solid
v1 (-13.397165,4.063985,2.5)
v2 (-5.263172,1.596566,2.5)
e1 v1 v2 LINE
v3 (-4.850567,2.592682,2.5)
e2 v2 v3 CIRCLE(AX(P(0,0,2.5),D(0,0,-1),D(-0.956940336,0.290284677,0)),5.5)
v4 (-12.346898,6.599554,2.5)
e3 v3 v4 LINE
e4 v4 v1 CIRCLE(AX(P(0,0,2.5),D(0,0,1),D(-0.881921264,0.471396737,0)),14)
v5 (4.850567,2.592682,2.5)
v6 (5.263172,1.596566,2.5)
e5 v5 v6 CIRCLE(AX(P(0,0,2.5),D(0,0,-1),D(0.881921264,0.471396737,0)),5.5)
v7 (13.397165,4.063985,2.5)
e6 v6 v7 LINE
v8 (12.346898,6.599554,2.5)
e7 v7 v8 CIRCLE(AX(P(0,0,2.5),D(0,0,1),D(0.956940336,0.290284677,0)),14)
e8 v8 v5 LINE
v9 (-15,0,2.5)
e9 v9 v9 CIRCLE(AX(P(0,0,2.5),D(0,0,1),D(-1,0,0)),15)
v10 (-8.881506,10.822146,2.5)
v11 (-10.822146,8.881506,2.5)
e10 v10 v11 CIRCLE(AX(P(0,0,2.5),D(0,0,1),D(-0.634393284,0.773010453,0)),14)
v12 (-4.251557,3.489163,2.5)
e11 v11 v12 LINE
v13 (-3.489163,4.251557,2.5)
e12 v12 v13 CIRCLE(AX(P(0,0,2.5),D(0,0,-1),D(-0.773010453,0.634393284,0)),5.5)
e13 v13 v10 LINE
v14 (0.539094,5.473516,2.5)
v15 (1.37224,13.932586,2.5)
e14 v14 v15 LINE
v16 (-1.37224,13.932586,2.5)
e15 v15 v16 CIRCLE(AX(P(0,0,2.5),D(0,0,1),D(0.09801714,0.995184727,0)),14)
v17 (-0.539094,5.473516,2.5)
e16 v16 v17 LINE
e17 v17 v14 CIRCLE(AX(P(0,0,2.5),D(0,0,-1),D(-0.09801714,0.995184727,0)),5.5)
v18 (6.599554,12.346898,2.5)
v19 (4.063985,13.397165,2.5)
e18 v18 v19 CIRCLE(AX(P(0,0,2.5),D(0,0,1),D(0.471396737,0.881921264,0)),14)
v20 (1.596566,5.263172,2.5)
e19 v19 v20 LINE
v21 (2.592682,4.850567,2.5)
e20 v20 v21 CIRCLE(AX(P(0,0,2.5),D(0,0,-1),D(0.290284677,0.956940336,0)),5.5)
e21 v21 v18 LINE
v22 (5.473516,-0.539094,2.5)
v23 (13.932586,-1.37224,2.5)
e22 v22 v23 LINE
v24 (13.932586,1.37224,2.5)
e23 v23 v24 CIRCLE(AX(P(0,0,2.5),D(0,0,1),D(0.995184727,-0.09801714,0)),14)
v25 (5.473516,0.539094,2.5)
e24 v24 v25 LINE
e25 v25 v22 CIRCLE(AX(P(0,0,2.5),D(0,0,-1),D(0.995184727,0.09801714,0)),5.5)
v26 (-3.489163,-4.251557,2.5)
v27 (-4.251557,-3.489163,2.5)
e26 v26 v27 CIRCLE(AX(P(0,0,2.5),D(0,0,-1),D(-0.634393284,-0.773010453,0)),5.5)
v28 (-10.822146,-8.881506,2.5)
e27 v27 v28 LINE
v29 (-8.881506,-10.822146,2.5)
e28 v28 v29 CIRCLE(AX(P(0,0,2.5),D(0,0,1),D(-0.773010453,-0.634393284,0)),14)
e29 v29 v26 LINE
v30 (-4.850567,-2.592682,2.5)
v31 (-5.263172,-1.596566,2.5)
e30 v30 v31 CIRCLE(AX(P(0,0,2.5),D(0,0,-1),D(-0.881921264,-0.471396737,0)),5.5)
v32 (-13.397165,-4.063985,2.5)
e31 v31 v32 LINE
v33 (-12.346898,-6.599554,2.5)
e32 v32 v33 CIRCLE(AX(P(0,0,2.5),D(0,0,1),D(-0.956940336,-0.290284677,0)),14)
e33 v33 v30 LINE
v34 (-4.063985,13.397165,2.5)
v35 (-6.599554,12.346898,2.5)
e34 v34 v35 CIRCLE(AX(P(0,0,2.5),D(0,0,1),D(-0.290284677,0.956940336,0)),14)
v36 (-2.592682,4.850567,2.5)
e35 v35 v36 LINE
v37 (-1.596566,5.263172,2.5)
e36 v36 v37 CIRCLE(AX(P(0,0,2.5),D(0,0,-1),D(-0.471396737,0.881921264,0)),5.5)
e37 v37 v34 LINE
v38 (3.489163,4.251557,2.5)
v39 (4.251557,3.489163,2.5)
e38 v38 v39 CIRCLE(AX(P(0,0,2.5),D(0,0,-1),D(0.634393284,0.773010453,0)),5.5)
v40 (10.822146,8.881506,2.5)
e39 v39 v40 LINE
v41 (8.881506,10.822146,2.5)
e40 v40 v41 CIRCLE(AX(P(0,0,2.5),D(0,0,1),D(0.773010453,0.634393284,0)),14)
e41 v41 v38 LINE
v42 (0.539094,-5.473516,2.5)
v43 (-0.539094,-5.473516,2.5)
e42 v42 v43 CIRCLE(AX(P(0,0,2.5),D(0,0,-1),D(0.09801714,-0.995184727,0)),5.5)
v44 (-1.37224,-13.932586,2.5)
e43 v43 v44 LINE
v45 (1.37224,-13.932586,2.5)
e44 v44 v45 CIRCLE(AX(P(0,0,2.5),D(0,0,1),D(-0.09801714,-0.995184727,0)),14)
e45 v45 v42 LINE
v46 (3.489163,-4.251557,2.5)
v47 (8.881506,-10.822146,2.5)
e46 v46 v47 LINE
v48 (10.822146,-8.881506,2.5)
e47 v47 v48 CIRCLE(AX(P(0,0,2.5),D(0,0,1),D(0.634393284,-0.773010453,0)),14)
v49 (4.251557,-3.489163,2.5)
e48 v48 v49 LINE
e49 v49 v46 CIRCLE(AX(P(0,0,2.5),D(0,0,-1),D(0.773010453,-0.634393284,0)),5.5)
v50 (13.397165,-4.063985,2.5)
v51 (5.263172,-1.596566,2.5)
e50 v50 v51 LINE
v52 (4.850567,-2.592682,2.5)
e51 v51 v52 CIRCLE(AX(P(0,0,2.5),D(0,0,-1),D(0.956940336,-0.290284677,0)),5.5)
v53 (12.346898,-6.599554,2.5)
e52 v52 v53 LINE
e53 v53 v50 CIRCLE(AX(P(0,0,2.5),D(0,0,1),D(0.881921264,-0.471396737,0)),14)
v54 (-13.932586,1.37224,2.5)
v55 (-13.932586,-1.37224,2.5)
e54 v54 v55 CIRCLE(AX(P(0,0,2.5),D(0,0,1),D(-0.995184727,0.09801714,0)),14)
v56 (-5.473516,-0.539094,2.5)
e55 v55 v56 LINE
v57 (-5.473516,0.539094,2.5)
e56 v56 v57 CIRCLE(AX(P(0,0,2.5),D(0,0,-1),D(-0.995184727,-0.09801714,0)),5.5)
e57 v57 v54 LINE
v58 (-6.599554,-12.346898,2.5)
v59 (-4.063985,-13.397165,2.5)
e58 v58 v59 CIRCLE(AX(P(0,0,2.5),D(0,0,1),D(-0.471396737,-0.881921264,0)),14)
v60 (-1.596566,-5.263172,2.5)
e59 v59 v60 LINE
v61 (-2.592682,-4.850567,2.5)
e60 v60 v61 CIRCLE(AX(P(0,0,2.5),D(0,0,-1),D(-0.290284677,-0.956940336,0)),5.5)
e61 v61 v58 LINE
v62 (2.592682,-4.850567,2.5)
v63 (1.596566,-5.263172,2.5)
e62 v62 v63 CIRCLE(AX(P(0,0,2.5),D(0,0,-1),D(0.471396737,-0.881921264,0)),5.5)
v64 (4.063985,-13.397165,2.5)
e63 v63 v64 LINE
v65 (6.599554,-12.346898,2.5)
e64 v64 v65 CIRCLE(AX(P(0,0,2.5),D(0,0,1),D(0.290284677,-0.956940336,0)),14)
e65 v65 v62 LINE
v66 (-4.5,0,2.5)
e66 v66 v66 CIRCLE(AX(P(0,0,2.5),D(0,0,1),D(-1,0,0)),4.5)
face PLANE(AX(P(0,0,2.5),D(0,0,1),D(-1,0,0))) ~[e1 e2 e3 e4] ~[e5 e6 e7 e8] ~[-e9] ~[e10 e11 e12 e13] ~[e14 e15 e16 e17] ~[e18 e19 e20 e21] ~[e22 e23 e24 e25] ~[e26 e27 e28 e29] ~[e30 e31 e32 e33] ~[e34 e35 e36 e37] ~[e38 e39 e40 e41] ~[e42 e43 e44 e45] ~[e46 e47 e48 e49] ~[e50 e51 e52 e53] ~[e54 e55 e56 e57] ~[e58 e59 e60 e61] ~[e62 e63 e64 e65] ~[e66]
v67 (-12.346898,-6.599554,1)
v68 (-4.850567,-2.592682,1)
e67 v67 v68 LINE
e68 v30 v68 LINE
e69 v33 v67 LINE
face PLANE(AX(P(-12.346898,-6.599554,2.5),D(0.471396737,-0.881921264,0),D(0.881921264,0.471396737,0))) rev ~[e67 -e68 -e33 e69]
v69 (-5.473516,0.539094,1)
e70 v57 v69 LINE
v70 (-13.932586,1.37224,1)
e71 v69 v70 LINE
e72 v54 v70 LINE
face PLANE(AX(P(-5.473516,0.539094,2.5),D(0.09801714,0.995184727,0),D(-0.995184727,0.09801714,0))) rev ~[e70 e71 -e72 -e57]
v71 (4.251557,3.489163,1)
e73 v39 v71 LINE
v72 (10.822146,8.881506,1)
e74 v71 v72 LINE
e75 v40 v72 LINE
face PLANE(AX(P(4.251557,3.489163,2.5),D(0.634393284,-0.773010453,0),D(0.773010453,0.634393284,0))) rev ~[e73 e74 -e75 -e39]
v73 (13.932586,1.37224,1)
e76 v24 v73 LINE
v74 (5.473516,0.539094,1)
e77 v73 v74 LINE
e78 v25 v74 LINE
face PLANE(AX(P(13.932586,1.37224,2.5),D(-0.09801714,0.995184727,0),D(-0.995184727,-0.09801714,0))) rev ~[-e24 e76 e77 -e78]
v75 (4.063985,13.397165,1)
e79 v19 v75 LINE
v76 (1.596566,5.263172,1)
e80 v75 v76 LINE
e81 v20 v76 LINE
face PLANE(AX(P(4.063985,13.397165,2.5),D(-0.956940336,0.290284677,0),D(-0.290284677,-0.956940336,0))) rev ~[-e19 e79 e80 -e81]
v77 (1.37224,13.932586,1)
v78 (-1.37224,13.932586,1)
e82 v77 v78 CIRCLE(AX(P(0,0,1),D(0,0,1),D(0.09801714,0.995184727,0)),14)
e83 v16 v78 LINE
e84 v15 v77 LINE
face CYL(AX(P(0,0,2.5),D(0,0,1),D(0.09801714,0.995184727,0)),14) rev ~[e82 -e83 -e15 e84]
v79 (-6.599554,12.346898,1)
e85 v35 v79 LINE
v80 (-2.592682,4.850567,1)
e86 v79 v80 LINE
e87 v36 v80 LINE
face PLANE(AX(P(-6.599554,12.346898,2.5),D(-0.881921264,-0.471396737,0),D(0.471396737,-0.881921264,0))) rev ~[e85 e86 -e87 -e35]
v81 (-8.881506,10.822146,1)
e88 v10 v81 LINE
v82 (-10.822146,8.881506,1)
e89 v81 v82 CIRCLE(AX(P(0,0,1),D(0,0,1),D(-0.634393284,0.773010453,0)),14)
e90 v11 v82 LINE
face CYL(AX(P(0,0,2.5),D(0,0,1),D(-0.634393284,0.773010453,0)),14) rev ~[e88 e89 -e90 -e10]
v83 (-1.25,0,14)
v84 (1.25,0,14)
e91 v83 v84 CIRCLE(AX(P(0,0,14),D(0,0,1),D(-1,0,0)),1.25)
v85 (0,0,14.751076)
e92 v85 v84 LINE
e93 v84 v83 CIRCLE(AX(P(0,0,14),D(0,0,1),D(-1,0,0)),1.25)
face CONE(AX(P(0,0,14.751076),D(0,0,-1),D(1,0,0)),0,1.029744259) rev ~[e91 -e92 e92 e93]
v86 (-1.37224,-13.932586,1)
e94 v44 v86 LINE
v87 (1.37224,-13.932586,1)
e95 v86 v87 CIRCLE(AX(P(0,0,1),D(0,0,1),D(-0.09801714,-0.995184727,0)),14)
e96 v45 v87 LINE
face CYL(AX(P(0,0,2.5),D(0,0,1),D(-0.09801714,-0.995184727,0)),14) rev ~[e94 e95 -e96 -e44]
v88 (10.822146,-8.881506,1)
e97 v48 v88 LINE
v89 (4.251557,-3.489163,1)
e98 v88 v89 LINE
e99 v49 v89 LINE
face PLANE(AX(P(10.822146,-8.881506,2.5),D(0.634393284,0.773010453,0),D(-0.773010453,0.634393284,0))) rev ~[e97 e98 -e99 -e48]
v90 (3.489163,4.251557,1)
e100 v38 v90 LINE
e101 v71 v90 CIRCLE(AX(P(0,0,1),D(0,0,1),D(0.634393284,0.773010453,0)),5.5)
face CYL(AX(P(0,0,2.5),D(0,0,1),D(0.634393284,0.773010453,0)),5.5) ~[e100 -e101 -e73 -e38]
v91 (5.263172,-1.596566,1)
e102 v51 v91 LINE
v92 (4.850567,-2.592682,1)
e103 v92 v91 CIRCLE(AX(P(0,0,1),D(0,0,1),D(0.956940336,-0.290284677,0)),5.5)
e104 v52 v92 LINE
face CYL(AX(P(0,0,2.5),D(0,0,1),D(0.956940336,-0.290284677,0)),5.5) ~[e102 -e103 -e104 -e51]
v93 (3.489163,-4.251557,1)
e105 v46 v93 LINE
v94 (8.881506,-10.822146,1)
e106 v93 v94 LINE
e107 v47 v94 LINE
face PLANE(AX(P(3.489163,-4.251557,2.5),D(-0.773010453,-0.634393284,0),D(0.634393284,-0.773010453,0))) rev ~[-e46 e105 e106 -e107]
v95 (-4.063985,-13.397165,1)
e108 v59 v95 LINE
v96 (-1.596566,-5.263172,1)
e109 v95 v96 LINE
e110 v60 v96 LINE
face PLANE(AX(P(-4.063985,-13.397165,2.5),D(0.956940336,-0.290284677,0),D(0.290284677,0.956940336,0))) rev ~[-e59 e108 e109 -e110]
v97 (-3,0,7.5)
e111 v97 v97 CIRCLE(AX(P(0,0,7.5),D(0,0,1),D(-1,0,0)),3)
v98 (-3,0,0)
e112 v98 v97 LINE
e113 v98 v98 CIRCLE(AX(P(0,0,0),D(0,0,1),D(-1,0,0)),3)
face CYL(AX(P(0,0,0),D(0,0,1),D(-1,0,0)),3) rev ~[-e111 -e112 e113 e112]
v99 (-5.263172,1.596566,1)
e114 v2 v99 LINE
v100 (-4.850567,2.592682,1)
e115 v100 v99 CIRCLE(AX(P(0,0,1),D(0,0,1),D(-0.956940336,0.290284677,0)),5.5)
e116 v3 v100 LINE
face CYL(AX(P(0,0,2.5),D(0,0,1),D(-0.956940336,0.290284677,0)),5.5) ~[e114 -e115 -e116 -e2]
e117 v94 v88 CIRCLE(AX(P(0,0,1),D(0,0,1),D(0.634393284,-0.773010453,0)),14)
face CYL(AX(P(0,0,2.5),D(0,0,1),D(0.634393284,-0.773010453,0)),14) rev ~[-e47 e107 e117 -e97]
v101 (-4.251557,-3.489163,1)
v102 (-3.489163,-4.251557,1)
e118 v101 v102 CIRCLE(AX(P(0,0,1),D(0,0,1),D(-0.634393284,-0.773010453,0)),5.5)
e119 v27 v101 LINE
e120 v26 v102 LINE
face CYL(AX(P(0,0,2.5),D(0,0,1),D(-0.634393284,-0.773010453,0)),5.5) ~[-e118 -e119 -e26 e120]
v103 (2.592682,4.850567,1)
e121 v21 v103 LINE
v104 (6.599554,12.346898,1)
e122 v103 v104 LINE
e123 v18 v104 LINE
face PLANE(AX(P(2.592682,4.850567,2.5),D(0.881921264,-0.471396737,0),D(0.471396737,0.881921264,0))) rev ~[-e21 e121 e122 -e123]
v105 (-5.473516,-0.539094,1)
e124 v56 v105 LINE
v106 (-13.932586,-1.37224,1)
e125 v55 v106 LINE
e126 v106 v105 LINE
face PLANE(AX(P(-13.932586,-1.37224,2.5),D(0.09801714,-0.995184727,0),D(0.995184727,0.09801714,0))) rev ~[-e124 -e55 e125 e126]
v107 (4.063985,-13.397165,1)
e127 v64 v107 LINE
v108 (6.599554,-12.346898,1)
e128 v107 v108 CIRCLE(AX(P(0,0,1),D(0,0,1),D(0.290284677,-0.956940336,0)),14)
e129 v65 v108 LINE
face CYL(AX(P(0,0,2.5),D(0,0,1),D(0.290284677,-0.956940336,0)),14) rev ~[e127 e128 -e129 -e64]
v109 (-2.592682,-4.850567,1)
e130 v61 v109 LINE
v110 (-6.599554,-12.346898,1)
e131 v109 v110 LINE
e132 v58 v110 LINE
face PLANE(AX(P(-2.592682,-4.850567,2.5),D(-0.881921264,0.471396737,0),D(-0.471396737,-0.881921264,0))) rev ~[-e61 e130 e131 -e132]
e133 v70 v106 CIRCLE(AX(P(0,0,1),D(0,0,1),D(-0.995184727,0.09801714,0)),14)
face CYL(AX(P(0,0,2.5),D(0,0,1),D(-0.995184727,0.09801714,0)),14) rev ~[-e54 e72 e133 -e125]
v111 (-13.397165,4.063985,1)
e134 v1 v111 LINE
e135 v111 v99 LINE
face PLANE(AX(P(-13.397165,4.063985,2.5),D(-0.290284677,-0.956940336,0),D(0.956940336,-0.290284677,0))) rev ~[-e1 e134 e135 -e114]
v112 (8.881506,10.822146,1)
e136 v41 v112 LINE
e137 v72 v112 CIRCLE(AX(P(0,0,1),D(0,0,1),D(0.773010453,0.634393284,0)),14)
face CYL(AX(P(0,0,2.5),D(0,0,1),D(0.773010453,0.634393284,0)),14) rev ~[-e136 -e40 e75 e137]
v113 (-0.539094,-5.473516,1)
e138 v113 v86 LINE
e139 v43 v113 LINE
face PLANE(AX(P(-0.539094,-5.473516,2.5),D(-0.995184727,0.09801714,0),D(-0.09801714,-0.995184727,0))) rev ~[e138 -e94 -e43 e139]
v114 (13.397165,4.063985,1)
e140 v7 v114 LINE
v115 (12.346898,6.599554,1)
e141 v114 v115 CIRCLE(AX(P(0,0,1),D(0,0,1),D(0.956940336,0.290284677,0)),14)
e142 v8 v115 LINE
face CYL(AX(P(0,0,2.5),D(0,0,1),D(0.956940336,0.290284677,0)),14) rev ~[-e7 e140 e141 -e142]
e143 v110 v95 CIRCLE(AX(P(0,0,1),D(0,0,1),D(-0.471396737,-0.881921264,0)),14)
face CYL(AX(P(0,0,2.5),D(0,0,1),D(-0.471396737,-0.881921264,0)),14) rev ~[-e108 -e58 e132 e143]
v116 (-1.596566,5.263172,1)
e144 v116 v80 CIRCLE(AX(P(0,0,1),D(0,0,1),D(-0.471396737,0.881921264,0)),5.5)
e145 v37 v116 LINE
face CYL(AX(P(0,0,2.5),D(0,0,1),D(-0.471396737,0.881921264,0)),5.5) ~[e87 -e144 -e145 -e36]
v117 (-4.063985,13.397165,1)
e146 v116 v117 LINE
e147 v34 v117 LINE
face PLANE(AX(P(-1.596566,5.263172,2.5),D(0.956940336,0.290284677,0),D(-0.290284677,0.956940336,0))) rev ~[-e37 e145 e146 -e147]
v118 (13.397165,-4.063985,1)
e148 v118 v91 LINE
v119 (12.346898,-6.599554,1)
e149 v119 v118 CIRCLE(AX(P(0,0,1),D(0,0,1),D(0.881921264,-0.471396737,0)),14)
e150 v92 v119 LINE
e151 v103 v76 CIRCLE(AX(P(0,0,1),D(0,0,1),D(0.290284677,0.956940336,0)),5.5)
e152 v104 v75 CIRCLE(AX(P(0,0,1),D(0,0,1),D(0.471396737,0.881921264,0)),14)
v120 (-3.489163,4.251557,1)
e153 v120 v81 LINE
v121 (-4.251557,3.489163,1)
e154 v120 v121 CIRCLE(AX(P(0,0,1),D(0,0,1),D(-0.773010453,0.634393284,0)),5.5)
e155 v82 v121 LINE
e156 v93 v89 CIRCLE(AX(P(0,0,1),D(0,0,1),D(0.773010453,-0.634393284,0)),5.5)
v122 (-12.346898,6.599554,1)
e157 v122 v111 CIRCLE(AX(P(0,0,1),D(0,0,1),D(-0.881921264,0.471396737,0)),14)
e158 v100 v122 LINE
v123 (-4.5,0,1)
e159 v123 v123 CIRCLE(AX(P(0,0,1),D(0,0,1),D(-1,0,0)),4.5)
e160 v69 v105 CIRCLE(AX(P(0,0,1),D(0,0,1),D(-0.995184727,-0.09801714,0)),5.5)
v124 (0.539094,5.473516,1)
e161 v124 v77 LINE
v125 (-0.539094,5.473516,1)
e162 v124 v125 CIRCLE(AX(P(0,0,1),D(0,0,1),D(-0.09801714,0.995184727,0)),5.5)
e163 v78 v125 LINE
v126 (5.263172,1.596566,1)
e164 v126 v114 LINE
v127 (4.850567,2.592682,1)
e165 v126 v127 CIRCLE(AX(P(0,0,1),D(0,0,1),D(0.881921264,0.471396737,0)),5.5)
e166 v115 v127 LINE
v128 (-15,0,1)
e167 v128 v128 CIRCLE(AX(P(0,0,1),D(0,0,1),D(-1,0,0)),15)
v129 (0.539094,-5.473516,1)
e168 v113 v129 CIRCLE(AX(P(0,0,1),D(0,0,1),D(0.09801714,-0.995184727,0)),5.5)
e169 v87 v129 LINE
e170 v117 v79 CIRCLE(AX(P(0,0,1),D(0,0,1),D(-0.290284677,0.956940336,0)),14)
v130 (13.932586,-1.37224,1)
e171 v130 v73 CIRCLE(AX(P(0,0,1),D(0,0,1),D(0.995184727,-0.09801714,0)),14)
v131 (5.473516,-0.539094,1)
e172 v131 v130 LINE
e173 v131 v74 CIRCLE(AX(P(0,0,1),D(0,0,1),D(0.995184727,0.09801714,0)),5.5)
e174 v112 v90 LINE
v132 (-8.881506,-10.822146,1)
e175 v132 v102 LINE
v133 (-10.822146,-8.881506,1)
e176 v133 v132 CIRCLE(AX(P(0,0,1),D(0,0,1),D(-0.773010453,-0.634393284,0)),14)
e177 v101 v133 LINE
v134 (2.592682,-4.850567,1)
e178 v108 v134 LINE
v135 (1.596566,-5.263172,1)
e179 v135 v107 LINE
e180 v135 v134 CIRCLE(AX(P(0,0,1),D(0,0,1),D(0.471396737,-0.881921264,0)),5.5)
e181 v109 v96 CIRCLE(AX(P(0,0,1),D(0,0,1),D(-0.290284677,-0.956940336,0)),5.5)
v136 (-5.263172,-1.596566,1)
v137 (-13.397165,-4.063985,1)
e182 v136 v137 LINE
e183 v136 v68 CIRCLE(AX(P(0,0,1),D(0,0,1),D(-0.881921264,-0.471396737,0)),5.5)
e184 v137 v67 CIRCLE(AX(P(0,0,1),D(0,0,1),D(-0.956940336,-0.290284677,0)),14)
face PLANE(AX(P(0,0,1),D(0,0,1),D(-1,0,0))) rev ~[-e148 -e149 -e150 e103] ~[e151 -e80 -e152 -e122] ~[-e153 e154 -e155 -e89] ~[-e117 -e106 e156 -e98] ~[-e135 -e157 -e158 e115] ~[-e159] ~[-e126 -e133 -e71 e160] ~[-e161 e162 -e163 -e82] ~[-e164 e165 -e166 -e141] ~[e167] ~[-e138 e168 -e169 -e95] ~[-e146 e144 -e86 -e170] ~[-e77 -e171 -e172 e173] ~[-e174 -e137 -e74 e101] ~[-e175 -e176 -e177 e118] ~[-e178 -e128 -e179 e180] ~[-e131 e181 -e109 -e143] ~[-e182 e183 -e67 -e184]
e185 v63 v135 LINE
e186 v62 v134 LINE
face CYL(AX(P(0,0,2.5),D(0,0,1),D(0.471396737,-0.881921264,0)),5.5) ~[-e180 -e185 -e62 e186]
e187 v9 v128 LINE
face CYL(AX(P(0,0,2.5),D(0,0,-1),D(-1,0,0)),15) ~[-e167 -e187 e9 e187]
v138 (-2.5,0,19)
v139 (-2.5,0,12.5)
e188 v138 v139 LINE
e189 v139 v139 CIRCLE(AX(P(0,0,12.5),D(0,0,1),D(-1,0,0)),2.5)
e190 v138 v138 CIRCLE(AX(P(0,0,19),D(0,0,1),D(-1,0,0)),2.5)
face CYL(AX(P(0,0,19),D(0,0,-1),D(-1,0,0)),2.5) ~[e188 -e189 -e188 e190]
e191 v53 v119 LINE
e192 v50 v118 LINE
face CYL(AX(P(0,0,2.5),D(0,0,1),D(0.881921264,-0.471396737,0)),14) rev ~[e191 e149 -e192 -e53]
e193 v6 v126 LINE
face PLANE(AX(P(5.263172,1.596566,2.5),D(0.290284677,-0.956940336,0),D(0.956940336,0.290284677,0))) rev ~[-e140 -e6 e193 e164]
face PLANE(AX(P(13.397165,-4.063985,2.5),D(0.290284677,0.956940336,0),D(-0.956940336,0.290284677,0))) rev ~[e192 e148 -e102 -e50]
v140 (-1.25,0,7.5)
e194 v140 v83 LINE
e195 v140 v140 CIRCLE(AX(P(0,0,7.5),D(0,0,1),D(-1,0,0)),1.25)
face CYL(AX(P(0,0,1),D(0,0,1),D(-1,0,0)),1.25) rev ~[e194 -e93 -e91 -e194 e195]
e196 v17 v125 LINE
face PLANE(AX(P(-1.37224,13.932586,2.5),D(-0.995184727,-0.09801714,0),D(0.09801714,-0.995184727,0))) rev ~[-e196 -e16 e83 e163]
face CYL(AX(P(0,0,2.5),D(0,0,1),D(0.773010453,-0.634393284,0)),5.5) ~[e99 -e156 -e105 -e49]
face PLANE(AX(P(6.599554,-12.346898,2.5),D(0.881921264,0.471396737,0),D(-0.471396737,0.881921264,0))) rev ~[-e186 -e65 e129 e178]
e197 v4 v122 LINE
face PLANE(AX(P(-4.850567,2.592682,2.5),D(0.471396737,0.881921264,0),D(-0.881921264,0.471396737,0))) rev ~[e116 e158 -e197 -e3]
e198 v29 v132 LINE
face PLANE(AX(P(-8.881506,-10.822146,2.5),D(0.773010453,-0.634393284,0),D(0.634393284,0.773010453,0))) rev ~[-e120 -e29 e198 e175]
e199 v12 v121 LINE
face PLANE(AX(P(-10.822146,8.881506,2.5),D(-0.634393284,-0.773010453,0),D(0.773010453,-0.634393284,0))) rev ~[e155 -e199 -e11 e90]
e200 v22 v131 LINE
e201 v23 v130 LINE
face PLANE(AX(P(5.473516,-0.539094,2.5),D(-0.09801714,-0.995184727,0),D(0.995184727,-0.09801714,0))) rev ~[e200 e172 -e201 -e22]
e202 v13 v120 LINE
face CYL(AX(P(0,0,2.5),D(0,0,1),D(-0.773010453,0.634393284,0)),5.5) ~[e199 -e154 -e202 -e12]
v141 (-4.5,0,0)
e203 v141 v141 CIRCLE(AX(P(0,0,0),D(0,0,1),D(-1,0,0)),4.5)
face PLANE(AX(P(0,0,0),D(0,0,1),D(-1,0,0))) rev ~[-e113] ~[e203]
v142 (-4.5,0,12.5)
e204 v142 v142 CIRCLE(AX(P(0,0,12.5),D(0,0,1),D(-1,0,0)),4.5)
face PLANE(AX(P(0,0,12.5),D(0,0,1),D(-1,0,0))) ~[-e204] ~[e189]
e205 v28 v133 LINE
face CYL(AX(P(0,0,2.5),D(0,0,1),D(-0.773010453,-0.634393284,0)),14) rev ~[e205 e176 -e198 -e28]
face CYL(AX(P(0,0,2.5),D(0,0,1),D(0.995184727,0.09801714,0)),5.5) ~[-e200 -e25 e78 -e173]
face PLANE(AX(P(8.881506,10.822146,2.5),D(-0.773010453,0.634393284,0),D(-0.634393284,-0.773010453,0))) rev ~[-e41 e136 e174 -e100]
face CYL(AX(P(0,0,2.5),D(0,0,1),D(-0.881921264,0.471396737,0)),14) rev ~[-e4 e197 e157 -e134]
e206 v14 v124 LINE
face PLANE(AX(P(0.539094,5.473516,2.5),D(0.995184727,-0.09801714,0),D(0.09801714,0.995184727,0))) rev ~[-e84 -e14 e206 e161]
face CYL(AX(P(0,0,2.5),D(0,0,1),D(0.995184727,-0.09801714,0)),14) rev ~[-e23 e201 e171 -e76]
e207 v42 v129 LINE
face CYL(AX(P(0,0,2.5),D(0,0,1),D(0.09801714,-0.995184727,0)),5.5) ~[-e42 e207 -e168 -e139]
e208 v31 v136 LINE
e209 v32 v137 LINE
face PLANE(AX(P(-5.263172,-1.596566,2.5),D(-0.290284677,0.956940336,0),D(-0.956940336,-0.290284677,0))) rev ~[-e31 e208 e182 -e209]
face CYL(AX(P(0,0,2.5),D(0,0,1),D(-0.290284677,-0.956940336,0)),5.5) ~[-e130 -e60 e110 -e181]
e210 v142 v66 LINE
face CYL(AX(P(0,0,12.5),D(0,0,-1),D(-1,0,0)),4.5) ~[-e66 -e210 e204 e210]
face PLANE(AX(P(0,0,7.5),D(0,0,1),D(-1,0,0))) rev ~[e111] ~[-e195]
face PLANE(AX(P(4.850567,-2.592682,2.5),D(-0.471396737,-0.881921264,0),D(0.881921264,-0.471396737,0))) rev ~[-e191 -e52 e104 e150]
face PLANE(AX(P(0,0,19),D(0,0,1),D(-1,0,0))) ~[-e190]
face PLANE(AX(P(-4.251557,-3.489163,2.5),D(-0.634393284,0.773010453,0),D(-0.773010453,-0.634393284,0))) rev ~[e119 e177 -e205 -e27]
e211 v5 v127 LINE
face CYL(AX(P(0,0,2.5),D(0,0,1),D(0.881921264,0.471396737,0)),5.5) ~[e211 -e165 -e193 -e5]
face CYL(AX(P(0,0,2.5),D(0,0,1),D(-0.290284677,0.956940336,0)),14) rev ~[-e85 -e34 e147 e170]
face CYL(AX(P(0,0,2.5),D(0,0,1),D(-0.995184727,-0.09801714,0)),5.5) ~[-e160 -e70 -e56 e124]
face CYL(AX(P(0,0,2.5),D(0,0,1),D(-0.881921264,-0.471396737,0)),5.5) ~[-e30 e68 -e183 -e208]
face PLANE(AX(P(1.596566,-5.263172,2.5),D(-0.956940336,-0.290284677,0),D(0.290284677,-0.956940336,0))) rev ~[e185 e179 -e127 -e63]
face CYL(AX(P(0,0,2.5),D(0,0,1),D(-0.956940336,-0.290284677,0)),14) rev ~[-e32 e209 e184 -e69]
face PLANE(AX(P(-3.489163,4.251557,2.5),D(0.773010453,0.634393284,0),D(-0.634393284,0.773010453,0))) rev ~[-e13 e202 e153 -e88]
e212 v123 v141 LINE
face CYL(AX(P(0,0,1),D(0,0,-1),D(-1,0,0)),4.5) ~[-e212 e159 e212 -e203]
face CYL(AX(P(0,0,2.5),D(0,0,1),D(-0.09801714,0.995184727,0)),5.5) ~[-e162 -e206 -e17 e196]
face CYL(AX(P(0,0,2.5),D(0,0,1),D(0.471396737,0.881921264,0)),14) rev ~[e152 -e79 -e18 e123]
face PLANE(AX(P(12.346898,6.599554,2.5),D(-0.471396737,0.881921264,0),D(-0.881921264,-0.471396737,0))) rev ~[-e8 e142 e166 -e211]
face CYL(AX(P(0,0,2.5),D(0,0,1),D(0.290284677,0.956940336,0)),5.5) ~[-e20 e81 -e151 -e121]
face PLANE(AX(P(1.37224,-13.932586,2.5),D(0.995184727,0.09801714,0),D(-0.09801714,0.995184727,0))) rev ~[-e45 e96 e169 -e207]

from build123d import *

# Parameters (mm, degrees)
F3_D            = 2.5
F3_DEPTH        = 6.5
F3_TIP          = 0.7510757738
F5_DEPTH        = 2.501
F5_COPIES_COUNT = 16


# Not quite as in the source:
# - a pattern or mirror of a feature is missing from the dataset's text; its kind, count and spacing are read off the source's solid


with BuildPart() as f1:
    # F0 (on Front) → F1 (revolve)
    with BuildSketch(Plane.XZ):
        Polygon((-4.5, 0), (-3, 0), (-3, 7.5), (0, 7.5), (0, 19), (-2.5, 19), (-2.5, 12.5), (-4.5, 12.5), (-4.5, 2.5), (-15, 2.5), (-15, 1), (-4.5, 1), align=None)
    revolve(axis=Axis((0, 0, 13.1862424314), (0, 0, 1)))

    # F3
    with Locations(Plane(origin=(0, 0, 7.5), x_dir=(1, 0, 0), z_dir=(0, 0, -1))):
        with Locations((0, 0)):
            Hole(F3_D / 2, depth=F3_DEPTH)
            with Locations((0, 0, -(F3_DEPTH + F3_TIP / 2))):  # 118° drill point
                Cone(0, F3_D / 2, F3_TIP, mode=Mode.SUBTRACT)

    # F4 (on face) → F5 (cut, through all)
    with BuildSketch(Plane.XY.offset(2.5)):
        with BuildLine():
            Line((-1.3722399646, 13.9325861734), (-0.5390942718, 5.4735159967))
            ThreePointArc((-0.5390942718, 5.4735159967), (0, 5.5), (0.5390942718, 5.4735159967))
            Line((0.5390942718, 5.4735159967), (1.3722399646, 13.9325861734))
            ThreePointArc((1.3722399646, 13.9325861734), (0, 14), (-1.3722399646, 13.9325861734))
        make_face()
    f5 = extrude(amount=-F5_DEPTH, mode=Mode.SUBTRACT)

    # F5_copies: F5 ×16 about axis
    f5_copies_axis = Axis((0, 0, 0), (0, 0, 1))
    for i in range(1, F5_COPIES_COUNT):
        add(f5.rotate(f5_copies_axis, i * 360 / F5_COPIES_COUNT), mode=Mode.SUBTRACT)


solid = f1.part
